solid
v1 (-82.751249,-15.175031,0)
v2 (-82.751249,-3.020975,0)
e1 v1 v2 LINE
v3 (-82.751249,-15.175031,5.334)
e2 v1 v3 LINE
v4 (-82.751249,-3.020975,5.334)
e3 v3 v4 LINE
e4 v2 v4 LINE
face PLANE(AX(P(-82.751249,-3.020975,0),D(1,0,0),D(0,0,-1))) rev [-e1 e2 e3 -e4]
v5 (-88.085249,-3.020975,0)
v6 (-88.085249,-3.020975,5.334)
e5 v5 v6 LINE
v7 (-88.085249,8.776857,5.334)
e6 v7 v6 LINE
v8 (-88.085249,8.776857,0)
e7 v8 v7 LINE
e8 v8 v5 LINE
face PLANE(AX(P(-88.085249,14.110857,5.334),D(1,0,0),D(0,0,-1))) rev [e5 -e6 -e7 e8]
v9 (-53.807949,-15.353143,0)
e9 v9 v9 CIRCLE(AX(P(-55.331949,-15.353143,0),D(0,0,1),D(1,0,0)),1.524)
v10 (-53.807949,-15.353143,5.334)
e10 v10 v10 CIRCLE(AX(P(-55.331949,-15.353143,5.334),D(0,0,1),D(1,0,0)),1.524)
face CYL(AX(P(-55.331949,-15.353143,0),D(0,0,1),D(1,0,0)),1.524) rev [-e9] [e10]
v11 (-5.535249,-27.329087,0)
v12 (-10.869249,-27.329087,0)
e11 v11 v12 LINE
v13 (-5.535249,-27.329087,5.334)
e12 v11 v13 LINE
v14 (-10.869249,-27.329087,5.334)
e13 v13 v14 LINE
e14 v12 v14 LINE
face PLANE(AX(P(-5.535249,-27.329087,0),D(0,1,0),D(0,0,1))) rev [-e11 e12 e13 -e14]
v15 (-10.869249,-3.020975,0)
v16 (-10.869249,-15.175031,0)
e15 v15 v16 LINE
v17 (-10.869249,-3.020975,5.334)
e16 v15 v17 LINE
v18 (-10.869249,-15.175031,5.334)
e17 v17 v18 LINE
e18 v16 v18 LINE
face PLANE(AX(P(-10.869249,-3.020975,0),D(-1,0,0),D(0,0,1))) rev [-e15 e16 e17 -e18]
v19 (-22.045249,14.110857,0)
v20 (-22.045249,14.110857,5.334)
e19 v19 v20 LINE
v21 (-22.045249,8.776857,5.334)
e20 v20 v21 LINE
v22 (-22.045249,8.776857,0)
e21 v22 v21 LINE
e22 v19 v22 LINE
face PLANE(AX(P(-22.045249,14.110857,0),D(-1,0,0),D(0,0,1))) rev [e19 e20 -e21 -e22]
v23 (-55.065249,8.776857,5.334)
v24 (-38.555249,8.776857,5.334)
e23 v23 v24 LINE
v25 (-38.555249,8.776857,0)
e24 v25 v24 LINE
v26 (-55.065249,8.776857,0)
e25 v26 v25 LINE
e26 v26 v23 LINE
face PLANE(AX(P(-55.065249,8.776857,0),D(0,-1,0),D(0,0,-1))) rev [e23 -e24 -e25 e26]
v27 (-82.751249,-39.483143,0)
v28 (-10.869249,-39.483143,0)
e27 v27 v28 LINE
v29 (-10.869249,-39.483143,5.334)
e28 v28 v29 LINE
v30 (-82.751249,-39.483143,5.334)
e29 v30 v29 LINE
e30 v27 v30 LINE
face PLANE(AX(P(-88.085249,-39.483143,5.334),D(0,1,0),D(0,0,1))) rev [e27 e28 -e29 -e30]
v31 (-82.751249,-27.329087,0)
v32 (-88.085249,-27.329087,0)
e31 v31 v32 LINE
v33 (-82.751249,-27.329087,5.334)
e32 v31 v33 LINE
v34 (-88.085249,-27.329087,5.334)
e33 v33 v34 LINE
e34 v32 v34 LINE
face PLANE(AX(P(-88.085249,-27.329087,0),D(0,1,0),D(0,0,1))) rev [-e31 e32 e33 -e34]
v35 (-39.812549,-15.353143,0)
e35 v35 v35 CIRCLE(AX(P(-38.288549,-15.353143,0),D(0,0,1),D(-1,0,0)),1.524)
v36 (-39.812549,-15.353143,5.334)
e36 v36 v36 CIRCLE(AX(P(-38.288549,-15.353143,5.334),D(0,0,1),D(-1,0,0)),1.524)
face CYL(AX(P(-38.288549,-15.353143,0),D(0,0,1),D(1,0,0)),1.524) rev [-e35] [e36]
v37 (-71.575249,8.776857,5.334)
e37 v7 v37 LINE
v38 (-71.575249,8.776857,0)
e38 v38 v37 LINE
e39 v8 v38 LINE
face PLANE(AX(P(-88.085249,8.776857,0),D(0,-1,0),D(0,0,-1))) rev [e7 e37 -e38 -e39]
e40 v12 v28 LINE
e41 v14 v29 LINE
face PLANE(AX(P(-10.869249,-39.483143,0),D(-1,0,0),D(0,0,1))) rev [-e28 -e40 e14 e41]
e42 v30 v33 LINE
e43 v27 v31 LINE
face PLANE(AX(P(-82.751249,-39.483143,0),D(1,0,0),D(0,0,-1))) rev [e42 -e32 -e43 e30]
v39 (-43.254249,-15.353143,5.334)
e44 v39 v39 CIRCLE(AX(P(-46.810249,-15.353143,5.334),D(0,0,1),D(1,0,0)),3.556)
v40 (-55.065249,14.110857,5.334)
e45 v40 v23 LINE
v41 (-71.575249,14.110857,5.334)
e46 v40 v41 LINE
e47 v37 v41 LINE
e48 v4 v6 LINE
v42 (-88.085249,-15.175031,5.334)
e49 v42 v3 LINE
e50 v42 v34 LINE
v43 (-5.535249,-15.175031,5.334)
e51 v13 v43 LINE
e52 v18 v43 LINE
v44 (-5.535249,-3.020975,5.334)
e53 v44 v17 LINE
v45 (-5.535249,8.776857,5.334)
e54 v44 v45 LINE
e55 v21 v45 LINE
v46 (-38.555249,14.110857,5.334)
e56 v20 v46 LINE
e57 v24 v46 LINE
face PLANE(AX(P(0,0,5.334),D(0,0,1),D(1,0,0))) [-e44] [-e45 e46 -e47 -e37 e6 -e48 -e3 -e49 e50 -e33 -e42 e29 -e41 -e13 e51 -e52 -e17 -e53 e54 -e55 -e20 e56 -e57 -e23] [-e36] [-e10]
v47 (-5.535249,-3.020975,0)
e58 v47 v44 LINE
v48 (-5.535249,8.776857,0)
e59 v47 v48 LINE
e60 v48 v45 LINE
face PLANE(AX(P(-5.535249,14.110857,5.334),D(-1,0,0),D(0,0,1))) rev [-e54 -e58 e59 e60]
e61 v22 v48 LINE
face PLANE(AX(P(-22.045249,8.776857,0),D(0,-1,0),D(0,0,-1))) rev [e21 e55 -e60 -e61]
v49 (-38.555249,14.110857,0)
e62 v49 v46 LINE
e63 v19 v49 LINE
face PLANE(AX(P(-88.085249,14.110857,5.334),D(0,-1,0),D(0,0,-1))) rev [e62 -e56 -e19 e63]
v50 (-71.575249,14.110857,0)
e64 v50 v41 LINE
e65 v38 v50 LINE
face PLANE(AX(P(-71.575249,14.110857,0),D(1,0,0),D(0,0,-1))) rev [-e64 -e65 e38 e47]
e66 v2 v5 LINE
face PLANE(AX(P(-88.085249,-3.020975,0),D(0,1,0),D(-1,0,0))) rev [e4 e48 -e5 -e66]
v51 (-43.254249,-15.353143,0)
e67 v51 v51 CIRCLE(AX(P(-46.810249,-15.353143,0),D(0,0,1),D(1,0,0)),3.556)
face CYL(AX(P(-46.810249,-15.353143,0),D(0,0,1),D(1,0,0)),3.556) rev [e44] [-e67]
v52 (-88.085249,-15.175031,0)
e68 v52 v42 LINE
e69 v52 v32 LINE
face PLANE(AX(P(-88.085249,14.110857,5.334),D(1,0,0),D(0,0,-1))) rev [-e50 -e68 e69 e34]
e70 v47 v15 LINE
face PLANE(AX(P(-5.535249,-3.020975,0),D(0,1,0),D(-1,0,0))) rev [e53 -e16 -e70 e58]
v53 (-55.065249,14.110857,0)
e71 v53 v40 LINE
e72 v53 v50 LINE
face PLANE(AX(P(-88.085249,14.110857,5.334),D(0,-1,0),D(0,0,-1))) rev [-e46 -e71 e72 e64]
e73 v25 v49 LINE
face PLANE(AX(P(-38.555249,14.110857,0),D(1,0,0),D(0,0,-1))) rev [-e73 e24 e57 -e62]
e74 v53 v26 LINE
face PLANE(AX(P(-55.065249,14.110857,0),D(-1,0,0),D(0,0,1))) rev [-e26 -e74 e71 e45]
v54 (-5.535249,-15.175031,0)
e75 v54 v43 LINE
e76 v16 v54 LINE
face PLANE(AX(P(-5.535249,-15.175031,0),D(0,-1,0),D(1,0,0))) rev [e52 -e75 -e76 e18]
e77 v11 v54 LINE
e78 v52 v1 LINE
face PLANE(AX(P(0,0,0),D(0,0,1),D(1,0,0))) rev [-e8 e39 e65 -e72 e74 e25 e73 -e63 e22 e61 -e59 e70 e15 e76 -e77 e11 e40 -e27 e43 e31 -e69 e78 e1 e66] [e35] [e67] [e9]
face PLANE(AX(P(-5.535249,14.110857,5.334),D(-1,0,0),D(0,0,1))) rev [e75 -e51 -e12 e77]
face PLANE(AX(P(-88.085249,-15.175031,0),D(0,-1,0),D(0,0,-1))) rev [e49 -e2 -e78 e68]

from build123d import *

# Parameters (mm, degrees)
SKETCH1_W                = 82.55
SKETCH1_H                = 53.594
BOSS_EXTRUDE1_DEPTH      = 5.334
CUT_EXTRUDE1_START       = -88.085249325
CUT_EXTRUDE1_OUTLINE_W   = 5.334
CUT_EXTRUDE1_OUTLINE_H   = 5.334
CUT_EXTRUDE1_DEPTH       = 16.51
CUT_EXTRUDE1_START_2     = -55.065249325
CUT_EXTRUDE1_2_OUTLINE_W = 5.334
CUT_EXTRUDE1_2_OUTLINE_H = 5.334
CUT_EXTRUDE1_2_DEPTH     = 16.51
CUT_EXTRUDE1_START_3     = -22.045249325
CUT_EXTRUDE1_3_OUTLINE_W = 5.334
CUT_EXTRUDE1_3_OUTLINE_H = 5.334
CUT_EXTRUDE1_3_DEPTH     = 16.51
SKETCH3_W                = 5.334
SKETCH3_H                = 12.154056038
CUT_EXTRUDE2_DEPTH       = 97.676684204
SKETCH4_R                = 3.556
SKETCH4_R_2              = 1.524
CUT_EXTRUDE3_DEPTH       = 97.676684204


# Read off the part's stored shape, not the designer's step: Cut-Extrude1
with BuildPart() as part:
    # Sketch1 → Boss-Extrude1 (new body)
    with BuildSketch(Plane.XY):
        with Locations((-46.810249325, -12.686142782)):
            Rectangle(SKETCH1_W, SKETCH1_H)
    extrude(amount=BOSS_EXTRUDE1_DEPTH)

    # Cut-Extrude1 outline → Cut-Extrude1 (cut)
    with BuildSketch(Plane.YZ.offset(CUT_EXTRUDE1_START)):
        with Locations((11.443857218, 2.667)):
            Rectangle(CUT_EXTRUDE1_OUTLINE_W, CUT_EXTRUDE1_OUTLINE_H)
    extrude(amount=CUT_EXTRUDE1_DEPTH, mode=Mode.SUBTRACT)

    # Cut-Extrude1 2 outline → Cut-Extrude1 2 (cut)
    with BuildSketch(Plane.YZ.offset(CUT_EXTRUDE1_START_2)):
        with Locations((11.443857218, 2.667)):
            Rectangle(CUT_EXTRUDE1_2_OUTLINE_W, CUT_EXTRUDE1_2_OUTLINE_H)
    extrude(amount=CUT_EXTRUDE1_2_DEPTH, mode=Mode.SUBTRACT)

    # Cut-Extrude1 3 outline → Cut-Extrude1 3 (cut)
    with BuildSketch(Plane.YZ.offset(CUT_EXTRUDE1_START_3)):
        with Locations((11.443857218, 2.667)):
            Rectangle(CUT_EXTRUDE1_3_OUTLINE_W, CUT_EXTRUDE1_3_OUTLINE_H)
    extrude(amount=CUT_EXTRUDE1_3_DEPTH, mode=Mode.SUBTRACT)

    # Sketch3 → Cut-Extrude2 (cut, through all)
    with BuildSketch(Plane.XY.offset(5.334)):
        with Locations((-85.418249325, -33.406114763)):
            Rectangle(SKETCH3_W, SKETCH3_H)
        with Locations((-85.418249325, -9.098002686)):
            Rectangle(SKETCH3_W, SKETCH3_H)
        with Locations((-8.202249325, -33.406114763)):
            Rectangle(SKETCH3_W, SKETCH3_H)
        with Locations((-8.202249325, -9.098002686)):
            Rectangle(SKETCH3_W, SKETCH3_H)
    extrude(amount=-CUT_EXTRUDE2_DEPTH, mode=Mode.SUBTRACT)

    # Sketch4 → Cut-Extrude3 (cut, through all)
    with BuildSketch(Plane.XY.offset(5.334)):
        with Locations((-46.810249325, -15.353142782)):
            Circle(SKETCH4_R)
        with Locations((-55.331949325, -15.353142782)):
            Circle(SKETCH4_R_2)
        with Locations(Location((-38.288549325, -15.353142782, 0), (0, 0, 180))):
            Circle(SKETCH4_R_2)
    extrude(amount=-CUT_EXTRUDE3_DEPTH, mode=Mode.SUBTRACT)


solid = part.part
